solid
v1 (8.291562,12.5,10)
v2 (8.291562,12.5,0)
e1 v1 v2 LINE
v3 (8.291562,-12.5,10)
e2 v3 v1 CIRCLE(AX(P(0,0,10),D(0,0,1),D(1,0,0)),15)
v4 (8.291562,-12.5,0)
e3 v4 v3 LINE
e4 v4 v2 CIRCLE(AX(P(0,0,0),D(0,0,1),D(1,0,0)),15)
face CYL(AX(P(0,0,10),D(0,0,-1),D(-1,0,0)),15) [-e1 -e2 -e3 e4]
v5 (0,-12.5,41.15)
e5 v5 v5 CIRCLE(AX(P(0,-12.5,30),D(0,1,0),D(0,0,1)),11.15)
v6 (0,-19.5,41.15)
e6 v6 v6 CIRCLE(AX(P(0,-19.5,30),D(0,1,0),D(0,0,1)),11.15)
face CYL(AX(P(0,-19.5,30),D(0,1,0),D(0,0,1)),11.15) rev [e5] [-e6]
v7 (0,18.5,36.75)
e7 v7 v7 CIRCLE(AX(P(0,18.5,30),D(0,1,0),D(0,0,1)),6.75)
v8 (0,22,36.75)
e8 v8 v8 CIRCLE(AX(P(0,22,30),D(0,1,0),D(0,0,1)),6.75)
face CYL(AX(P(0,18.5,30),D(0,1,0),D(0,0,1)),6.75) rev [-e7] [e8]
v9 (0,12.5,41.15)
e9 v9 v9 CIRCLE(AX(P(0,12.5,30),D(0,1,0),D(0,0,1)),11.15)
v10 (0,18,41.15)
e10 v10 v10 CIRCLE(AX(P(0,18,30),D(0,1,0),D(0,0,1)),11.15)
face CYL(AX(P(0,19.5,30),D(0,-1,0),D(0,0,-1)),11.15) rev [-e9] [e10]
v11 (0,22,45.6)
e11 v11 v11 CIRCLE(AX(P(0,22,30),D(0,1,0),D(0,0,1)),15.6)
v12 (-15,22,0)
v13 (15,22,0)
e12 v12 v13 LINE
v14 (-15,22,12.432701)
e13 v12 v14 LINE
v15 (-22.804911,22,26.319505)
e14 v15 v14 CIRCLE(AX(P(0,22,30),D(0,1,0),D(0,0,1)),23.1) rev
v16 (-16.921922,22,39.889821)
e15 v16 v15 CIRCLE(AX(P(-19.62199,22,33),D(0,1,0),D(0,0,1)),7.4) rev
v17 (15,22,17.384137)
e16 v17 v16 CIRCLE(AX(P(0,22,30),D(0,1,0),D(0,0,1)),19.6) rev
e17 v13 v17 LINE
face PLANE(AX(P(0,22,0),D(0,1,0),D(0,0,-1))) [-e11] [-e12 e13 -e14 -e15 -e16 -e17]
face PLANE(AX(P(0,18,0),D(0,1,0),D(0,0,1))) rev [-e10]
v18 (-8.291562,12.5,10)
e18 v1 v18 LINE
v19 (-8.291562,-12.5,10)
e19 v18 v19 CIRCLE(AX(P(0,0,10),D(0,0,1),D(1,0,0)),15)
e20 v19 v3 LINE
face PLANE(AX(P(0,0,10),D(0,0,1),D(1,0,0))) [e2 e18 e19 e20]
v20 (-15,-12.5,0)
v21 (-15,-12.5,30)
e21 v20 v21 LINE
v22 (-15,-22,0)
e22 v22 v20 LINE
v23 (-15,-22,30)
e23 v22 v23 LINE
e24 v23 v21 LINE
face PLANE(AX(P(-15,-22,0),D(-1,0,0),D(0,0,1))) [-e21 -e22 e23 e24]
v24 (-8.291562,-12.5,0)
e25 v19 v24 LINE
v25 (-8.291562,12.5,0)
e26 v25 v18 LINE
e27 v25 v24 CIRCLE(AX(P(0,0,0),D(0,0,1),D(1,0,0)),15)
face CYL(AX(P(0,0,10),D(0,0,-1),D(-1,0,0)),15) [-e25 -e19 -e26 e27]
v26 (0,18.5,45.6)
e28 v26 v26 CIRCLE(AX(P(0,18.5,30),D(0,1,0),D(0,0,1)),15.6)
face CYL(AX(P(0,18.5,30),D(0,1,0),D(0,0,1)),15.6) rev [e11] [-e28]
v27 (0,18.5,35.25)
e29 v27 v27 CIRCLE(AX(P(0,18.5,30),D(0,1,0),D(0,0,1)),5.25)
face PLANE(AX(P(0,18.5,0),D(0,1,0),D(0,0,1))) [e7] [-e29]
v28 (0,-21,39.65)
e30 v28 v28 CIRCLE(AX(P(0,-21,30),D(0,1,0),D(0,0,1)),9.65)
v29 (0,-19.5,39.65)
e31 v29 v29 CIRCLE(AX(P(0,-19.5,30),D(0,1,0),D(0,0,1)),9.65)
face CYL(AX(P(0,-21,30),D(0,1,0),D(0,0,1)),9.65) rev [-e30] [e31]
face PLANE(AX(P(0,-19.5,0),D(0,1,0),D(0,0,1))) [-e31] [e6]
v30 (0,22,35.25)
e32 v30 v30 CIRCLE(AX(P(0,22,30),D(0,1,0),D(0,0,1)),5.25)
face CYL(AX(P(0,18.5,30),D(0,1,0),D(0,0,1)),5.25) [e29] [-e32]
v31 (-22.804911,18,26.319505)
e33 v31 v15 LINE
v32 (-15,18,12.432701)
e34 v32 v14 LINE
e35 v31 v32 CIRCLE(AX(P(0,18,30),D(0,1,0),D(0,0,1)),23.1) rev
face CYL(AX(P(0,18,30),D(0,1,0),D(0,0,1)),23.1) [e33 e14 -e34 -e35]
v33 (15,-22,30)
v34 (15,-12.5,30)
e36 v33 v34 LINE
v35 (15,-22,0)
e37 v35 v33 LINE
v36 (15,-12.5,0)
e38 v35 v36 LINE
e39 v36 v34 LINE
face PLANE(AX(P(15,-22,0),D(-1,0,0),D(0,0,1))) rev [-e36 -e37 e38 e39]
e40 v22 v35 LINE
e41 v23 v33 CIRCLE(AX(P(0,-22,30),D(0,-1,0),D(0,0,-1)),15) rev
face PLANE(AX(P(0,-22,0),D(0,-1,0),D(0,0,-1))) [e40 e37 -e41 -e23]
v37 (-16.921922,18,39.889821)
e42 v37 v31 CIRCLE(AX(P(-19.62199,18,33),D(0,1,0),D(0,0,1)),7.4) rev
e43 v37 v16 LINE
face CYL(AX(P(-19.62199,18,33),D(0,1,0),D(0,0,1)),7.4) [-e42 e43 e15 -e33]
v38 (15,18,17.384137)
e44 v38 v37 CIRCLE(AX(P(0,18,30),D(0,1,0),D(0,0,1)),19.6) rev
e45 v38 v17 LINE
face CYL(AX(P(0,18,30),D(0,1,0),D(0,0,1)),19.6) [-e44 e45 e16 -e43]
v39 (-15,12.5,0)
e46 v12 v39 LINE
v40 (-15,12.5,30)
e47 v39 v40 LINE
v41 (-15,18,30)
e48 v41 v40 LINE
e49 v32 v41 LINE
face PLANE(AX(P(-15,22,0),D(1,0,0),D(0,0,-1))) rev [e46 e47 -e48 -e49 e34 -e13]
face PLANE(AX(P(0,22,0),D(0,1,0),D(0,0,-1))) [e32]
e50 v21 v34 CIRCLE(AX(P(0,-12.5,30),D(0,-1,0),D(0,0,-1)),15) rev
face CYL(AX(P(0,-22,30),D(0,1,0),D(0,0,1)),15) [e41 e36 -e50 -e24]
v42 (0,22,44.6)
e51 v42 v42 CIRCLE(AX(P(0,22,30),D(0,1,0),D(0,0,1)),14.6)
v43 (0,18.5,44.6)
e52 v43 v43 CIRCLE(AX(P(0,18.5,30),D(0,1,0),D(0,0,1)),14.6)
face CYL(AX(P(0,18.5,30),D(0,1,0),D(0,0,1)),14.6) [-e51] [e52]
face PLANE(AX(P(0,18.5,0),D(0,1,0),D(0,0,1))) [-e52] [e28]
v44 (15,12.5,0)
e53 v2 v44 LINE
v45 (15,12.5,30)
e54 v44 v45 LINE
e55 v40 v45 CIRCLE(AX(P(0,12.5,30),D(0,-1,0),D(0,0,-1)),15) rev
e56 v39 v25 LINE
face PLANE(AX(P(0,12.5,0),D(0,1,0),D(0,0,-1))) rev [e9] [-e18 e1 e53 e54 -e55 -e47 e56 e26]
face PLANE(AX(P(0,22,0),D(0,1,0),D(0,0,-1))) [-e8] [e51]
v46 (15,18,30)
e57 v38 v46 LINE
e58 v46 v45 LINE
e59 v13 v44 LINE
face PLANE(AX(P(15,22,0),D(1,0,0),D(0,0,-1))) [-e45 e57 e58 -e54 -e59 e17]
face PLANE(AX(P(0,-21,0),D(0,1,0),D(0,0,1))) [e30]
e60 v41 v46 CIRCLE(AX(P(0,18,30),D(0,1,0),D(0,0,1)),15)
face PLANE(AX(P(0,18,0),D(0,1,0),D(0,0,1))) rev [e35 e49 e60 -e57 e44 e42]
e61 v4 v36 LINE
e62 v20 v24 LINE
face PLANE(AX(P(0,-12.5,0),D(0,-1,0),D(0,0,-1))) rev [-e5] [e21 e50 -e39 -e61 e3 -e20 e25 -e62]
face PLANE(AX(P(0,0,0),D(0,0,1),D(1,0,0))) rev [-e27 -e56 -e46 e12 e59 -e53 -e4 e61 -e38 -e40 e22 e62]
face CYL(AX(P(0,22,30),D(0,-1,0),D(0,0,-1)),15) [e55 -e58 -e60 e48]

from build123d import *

# Parameters (mm, degrees)
SKETCH_335_R           = 15
EXTRUDE_380_DEPTH      = 10
EXTRUDE_START          = -2.5
EXTRUDE_822_DEPTH      = 9.5
SKETCH_883_R           = 9.65
CUT_EXTRUDE_1089_DEPTH = 8.5
SKETCH_4_3_R           = 11.15
SKETCH_4_3_R_2         = 9.65
CUT_EXTRUDE_1131_DEPTH = 7
CUT_EXTRUDE_1399_REACH = 66.699
SKETCH_1242_R          = 3.6
EXTRUDE_3_DEPTH        = 4
SKETCH_4_5_R           = 15.6
SKETCH_4_5_R_2         = 14.6
SKETCH_4_5_R_3         = 6.75
SKETCH_4_5_R_4         = 5.25
CUT_EXTRUDE_1_DEPTH    = 3.5


with BuildPart() as part:
    # Sketch 335 → Extrude 380 (new body)
    with BuildSketch(Plane.XY):
        Circle(SKETCH_335_R)
    extrude(amount=EXTRUDE_380_DEPTH)

    # Эскиз2 → Extrude 822 (add)
    with BuildSketch(Plane(origin=(0, -15, 0), x_dir=(-1, 0, 0), z_dir=(0, -1, 0)).offset(EXTRUDE_START)):
        with BuildLine():
            Line((15, -30), (15, 0))
            Line((15, 0), (-15, 0))
            Line((-15, 0), (-15, -30))
            ThreePointArc((-15, -30), (0, -45), (15, -30))
        make_face()
    extrude_822 = extrude(amount=EXTRUDE_822_DEPTH)

    # Sketch 883 → Cut-Extrude 1089 (cut)
    with BuildSketch(Plane(origin=(0, -12.5, 0), x_dir=(1, 0, 0), z_dir=(0, 1, 0))):
        with Locations((0, -30)):
            Circle(SKETCH_883_R)
    cut_extrude_1089 = extrude(amount=-CUT_EXTRUDE_1089_DEPTH, mode=Mode.SUBTRACT)

    # Эскиз4<3> → Cut-Extrude 1131 (cut)
    with BuildSketch(Plane(origin=(0, -12.5, 0), x_dir=(1, 0, 0), z_dir=(0, 1, 0))):
        with Locations((0, -30)):
            Circle(SKETCH_4_3_R)
        with Locations((0, -30)):
            Circle(SKETCH_4_3_R_2, mode=Mode.SUBTRACT)
    cut_extrude_1131 = extrude(amount=-CUT_EXTRUDE_1131_DEPTH, mode=Mode.SUBTRACT)

    # Зеркальное отражение2: Extrude 822, Cut-Extrude 1089, Cut-Extrude 1131 across plane
    add(extrude_822.mirror(Plane.ZX))
    add(cut_extrude_1089.mirror(Plane.ZX), mode=Mode.SUBTRACT)
    add(cut_extrude_1131.mirror(Plane.ZX), mode=Mode.SUBTRACT)

    # Sketch 1242 → Cut-Extrude 1399 (cut, up to next)
    with BuildSketch(Plane(origin=(0, 22, 0), x_dir=(1, 0, 0), z_dir=(0, 1, 0)), mode=Mode.PRIVATE) as cut_extrude_1399_sk1:
        with Locations((0, -30)):
            Circle(SKETCH_1242_R)
    cut_extrude_1399_tool1 = extrude(cut_extrude_1399_sk1.sketch, amount=-CUT_EXTRUDE_1399_REACH, mode=Mode.PRIVATE) & part.part
    add(cut_extrude_1399_tool1.solids().sort_by_distance((0, 22, 30))[0], mode=Mode.SUBTRACT)

    # Эскиз4 → Бобышка-Вытянуть3 (add)
    with BuildSketch(Plane(origin=(0, 22, 0), x_dir=(1, 0, 0), z_dir=(0, 1, 0))):
        with BuildLine():
            ThreePointArc((-16.921921975, -39.889820861), (11.29379909, -46.019054345), (15, -17.38413697))
            Line((15, -17.38413697), (15, -25.715142943))
            ThreePointArc((15, -25.715142943), (0, -14.4), (-15, -25.715142943))
            Line((-15, -25.715142943), (-15, -12.432700834))
            ThreePointArc((-15, -12.432700834), (-20.137369493, -18.682034198), (-22.804910758, -26.319504748))
            ThreePointArc((-22.804910758, -26.319504748), (-26.411442066, -35.943355833), (-16.921921975, -39.889820861))
        make_face()
    extrude(amount=-EXTRUDE_3_DEPTH)

    # Эскиз4<5> → Вырез-Вытянуть1 (cut)
    # profile 1 of 2: a face of its own
    with BuildSketch(Plane(origin=(0, 22, 0), x_dir=(1, 0, 0), z_dir=(0, 1, 0))):
        with Locations((0, -30)):
            Circle(SKETCH_4_5_R)
        with Locations((0, -30)):
            Circle(SKETCH_4_5_R_2, mode=Mode.SUBTRACT)
    # profile 2 of 2: a face of its own
    with BuildSketch(Plane(origin=(0, 22, 0), x_dir=(1, 0, 0), z_dir=(0, 1, 0))):
        with Locations((0, -30)):
            Circle(SKETCH_4_5_R_3)
        with Locations((0, -30)):
            Circle(SKETCH_4_5_R_4, mode=Mode.SUBTRACT)
    extrude(amount=-CUT_EXTRUDE_1_DEPTH, mode=Mode.SUBTRACT)


solid = part.part
